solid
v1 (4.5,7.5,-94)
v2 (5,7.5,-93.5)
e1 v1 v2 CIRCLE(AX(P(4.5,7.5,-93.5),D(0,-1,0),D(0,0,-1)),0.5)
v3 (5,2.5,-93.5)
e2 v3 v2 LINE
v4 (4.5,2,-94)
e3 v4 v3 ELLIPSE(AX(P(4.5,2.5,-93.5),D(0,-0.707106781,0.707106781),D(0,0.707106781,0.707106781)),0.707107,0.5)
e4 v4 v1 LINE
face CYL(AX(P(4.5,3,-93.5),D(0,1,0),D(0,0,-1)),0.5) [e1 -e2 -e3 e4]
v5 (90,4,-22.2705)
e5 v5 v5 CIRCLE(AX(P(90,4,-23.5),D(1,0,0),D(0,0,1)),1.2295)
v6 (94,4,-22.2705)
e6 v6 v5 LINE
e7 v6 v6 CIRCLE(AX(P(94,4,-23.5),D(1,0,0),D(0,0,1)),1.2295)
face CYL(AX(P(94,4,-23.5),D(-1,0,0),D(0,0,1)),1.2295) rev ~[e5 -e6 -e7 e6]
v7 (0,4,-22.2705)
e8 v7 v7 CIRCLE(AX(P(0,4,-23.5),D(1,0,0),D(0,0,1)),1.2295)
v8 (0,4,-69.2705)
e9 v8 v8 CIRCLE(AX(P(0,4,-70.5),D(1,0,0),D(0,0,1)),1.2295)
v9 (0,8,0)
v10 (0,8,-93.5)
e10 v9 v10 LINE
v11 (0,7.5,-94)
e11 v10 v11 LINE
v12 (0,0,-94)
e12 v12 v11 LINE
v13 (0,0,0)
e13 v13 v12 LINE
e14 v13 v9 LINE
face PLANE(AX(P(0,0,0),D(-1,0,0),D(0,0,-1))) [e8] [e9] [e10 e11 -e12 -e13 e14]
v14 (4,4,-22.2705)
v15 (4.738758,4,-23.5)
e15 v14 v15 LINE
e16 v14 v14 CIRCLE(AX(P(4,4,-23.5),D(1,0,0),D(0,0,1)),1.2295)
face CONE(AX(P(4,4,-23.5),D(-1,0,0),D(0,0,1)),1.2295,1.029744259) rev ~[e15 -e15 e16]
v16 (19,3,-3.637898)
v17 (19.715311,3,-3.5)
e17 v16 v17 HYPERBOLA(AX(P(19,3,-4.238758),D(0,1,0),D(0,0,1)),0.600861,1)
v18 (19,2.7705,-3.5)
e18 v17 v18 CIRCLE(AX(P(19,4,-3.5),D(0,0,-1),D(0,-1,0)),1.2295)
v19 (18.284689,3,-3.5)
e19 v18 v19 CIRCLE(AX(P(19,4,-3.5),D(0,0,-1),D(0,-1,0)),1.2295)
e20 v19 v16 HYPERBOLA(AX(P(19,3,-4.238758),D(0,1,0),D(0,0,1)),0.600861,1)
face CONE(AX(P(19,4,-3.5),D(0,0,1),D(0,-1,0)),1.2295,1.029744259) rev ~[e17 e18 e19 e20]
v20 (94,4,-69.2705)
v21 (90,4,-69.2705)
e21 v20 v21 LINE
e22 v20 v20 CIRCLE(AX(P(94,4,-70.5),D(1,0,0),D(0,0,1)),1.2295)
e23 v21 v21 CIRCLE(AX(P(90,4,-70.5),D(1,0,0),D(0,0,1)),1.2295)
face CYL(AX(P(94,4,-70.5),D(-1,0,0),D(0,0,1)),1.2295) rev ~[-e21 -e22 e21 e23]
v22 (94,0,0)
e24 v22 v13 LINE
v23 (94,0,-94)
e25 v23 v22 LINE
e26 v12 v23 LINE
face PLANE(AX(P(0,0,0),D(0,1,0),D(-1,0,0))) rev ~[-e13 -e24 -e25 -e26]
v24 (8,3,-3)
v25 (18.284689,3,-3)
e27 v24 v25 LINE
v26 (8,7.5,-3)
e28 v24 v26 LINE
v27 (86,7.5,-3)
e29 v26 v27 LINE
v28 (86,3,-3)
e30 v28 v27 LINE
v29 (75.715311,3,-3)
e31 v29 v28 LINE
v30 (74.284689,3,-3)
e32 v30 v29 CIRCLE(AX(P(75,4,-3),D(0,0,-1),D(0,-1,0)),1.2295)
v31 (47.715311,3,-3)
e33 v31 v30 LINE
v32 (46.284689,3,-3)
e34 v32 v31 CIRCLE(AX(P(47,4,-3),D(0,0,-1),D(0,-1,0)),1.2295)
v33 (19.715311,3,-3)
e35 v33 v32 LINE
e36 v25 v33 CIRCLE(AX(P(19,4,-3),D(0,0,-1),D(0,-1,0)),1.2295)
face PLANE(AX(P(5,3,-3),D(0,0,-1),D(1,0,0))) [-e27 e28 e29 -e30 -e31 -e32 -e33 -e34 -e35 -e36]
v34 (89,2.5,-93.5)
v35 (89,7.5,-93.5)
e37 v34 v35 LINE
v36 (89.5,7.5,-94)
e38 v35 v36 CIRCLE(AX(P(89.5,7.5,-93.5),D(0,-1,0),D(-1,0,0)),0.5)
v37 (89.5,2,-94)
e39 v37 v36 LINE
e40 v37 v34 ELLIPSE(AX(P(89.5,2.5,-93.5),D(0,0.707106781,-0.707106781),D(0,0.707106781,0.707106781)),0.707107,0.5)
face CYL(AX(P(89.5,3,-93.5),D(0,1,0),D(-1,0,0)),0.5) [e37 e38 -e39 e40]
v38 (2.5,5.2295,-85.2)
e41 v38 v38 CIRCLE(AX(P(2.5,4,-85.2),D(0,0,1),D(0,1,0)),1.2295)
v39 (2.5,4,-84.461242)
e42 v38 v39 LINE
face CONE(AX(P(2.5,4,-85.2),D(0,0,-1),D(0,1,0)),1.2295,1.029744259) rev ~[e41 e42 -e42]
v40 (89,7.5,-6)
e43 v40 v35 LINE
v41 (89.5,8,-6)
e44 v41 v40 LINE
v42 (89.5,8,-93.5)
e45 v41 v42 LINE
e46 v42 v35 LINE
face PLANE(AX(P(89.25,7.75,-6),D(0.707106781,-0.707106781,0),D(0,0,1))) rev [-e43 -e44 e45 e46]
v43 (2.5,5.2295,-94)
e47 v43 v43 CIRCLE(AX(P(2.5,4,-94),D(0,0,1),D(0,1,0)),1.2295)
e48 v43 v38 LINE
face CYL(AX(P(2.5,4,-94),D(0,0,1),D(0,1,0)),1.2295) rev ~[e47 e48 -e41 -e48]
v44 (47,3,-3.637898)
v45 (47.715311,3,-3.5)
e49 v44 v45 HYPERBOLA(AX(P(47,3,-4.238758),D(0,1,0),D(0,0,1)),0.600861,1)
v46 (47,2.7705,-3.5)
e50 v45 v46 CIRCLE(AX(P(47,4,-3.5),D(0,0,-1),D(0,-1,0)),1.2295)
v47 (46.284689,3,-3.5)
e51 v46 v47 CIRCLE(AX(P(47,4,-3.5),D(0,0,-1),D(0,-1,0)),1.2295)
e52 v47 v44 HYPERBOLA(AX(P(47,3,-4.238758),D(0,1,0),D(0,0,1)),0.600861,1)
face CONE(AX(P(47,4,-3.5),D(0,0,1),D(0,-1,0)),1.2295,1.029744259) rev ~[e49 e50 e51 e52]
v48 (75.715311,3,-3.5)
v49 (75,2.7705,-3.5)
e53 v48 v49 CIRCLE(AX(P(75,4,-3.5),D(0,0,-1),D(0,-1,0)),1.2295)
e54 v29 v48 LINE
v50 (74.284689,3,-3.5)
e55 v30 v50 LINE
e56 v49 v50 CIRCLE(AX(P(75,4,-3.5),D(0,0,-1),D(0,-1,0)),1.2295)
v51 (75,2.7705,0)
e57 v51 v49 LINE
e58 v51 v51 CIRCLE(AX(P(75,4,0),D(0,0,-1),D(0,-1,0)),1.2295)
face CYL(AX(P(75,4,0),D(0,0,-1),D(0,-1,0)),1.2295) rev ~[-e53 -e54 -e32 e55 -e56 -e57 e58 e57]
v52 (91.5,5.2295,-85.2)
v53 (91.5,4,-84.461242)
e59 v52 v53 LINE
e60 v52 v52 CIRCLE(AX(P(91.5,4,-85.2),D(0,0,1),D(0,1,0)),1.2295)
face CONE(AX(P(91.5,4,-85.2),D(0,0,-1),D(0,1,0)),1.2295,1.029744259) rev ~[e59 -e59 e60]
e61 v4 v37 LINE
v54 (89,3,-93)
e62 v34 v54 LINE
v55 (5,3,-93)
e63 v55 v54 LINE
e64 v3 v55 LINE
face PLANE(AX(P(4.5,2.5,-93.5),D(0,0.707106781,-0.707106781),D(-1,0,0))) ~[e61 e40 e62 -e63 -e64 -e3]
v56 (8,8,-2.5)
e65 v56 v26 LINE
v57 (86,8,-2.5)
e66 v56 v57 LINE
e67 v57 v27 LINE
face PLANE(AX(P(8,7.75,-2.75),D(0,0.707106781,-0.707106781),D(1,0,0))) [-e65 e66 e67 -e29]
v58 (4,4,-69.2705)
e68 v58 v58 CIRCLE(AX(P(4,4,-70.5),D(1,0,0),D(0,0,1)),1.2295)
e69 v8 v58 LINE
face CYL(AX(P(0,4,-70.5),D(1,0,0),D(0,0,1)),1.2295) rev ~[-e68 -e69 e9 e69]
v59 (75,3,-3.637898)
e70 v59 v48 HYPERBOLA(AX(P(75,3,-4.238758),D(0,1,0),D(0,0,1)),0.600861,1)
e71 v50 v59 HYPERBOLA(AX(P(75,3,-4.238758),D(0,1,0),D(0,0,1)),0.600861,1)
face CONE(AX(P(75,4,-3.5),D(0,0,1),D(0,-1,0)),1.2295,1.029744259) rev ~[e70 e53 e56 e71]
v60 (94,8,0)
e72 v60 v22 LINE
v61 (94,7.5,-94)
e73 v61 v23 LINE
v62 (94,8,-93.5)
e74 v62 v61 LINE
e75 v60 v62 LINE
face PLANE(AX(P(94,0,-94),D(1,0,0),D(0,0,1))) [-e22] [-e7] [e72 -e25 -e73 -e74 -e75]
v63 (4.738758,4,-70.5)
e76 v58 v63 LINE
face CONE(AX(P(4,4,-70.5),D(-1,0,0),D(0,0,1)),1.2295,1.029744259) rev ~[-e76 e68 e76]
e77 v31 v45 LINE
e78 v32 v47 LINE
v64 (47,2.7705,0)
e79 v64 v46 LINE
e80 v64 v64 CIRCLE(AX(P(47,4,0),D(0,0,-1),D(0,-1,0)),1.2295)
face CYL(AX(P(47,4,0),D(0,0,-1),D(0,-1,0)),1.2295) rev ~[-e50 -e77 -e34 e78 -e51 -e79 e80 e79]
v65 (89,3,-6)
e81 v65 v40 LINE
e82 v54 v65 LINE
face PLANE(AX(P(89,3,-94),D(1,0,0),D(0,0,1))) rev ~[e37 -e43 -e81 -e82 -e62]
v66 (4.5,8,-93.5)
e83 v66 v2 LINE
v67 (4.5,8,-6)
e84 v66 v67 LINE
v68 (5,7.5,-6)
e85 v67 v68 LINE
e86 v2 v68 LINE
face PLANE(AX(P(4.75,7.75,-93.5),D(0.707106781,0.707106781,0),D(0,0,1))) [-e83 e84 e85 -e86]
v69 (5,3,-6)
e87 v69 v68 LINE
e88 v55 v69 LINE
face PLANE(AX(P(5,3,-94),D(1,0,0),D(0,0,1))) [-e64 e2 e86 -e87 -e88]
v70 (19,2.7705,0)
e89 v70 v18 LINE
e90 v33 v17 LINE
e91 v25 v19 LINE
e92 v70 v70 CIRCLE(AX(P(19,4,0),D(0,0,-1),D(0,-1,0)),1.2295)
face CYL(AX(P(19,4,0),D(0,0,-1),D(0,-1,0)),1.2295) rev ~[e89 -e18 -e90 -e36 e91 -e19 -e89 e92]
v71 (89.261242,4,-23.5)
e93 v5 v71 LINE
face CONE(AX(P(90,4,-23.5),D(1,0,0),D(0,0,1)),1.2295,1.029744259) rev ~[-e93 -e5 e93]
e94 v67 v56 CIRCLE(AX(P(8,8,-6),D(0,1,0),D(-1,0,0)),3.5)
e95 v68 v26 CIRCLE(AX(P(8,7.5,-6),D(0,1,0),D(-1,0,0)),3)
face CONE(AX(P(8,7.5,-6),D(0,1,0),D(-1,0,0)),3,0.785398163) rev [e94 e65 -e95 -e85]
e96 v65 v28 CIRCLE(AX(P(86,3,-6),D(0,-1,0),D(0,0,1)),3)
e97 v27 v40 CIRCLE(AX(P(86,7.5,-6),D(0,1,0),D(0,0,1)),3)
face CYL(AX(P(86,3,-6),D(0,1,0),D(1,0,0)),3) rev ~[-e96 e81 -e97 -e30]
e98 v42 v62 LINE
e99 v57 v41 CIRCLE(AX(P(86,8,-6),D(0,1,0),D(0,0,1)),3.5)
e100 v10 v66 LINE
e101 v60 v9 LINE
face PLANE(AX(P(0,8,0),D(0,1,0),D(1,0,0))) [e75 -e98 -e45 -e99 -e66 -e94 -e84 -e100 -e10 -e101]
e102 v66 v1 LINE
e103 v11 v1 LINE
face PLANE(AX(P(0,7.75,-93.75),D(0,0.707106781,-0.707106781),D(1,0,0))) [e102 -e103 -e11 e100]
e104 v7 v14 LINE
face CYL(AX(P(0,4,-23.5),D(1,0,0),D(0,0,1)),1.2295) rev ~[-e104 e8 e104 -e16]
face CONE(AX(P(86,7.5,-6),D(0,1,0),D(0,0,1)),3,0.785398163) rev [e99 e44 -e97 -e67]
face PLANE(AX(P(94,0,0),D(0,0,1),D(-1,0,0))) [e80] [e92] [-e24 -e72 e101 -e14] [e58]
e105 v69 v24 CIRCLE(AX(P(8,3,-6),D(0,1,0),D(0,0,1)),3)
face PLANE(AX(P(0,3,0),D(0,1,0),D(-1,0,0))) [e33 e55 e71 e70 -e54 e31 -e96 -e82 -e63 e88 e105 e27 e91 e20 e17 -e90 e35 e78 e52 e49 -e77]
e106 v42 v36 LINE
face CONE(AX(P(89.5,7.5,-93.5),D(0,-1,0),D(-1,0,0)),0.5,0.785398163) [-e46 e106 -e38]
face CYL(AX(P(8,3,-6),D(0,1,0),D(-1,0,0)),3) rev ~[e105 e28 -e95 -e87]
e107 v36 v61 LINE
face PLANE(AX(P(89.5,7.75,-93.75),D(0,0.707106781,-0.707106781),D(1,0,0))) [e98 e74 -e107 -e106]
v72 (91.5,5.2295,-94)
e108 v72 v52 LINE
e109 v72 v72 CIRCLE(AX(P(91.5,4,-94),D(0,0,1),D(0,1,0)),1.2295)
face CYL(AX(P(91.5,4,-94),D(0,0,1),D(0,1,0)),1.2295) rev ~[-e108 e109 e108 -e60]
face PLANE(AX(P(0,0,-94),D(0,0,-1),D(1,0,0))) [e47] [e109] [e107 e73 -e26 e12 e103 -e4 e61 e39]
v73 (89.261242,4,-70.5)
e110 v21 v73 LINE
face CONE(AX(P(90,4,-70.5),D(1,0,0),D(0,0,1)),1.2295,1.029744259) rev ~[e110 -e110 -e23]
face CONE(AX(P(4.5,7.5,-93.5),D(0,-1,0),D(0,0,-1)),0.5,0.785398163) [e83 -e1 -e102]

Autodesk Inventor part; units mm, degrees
ref_plane "YZ Plane" through (0, 0, 0) normal (1, 0, 0) x (0, 1, 0)
ref_plane "XZ Plane" through (0, 0, 0) normal (0, 1, 0) x (-1, 0, 0)
sketch "Sketch3" plane through (0, 0, 0) normal (0, 1, 0) x (-1, 0, 0)
  line L0 (3, 3) -> (-97, 3) construction
  line L1 (-97, 3) -> (-97, 0) construction
  line L2 (-97, 0) -> (3, 0) construction
  line L3 (3, 0) -> (3, 3) construction
  line L4 (-97, 0) -> (-94, 0) construction
  line L5 (-94, 0) -> (-94, -94) construction
  line L6 (-94, -94) -> (-97, -94) construction
  line L7 (-97, -94) -> (-97, 0) construction
  line L8 (-97, -94) -> (3, -94) construction
  line L9 (3, -94) -> (3, -97) construction
  line L10 (3, -97) -> (-97, -97) construction
  line L11 (-97, -97) -> (-97, -94) construction
  line L12 (3, -94) -> (0, -94) construction
  line L13 (0, -94) -> (0, 0) construction
  line L14 (0, 0) -> (3, 0) construction
  line L15 (3, 0) -> (3, -94) construction
  line L16 (0, -94) -> (-94, -94)
  line L17 (-94, -94) -> (-94, 0)
  line L18 (-94, 0) -> (0, 0)
  line L19 (0, 0) -> (0, -94)
  line L20 (3, 3) -> (3, 0) construction
  dimension "d6" = 3
  dimension "d7" = 100
  dimension "d8" = 100
  dimension "d9" = 3
extrude "Extrusion2" add sketch "Sketch3" along normal blind 3
sketch "Sketch4" plane through (0, 3, 0) normal (0, 1, 0) x (1, 0, 0)
  line L0 (94, 94) -> (0, 94) projected
  line L1 (0, 0) -> (94, 0) projected
  line L2 (0, 94) -> (5, 94)
  line L3 (5, 94) -> (5, 0)
  line L4 (5, 0) -> (0, 0)
  line L5 (0, 0) -> (0, 94)
  line L6 (94, 0) -> (94, 94) projected
  line L7 (94, 94) -> (89, 94)
  line L8 (89, 94) -> (89, 0)
  line L9 (89, 0) -> (94, 0)
  line L10 (94, 0) -> (94, 94)
  line L11 (5, 3) -> (89, 3)
  line L12 (89, 3) -> (89, 0)
  line L13 (89, 0) -> (5, 0)
  line L14 (5, 0) -> (5, 3)
  dimension "d12" = 5
  dimension "d13" = 3
extrude "Extrusion3" add sketch "Sketch4" along normal blind 5 contours L6 L1 L8 L0 | L3 L1 L5 L0 | L8 L1 L3 L11
sketch "Sketch6" plane through (94, 0, -94) normal (0, 0, -1) x (-1, 0, 0)
  line L0 (0, 0) -> (94, 0) projected
  line L1 (89, 8) -> (94, 8) projected
  line L2 (89, 3) -> (89, 8) projected
  line L3 (94, 0) -> (94, 8) projected
  line L4 (0, 0) -> (0, 8) projected
  point P0 (91.5, 4)
  point P1 (2.5, 4)
  dimension "d28" = 8
  dimension "d29" = 5
  dimension "d30" = 2.5
  dimension "d31" = 4
  dimension "d32" = 2.5
hole "Hole1" at (2.5, 4, -94) at (91.5, 4, -94) direction (0, 0, 1) diameter 2.459 depth 8.8 tip angle 118 thread size "M3x0.5" class "6H" standard "ANSI Metric M Profile"
fillet "Fillet1" radius 3 2 edges at (89, 5.5, -3) (5, 5.5, -3)
fillet "Fillet2" radius 0.5 2 edges at (5, 5.5, -94) (89, 5.5, -94)
sketch "Sketch7" plane through (0, 0, 0) normal (0, 0, 1) x (1, 0, 0)
  line L0 (0, 0) -> (94, 0) projected
  line L1 (0, 0) -> (0, 8) projected
  line L2 (89, 8) -> (5, 8) projected
  point P0 (19, 4)
  point P1 (47, 4)
  point P2 (75, 4)
  dimension "d40" = 4
  dimension "d57" = 84
  dimension "d58" = 14
  dimension "d59" = 28
  dimension "d60" = 28
hole "Hole2" at (19, 4, 0) at (47, 4, 0) at (75, 4, 0) direction (0, 0, -1) diameter 2.459 depth 3.5 tip angle 118 thread size "M3x0.5" class "6H" standard "ANSI Metric M Profile"
sketch "Sketch9" plane through (0, 0, -94) normal (-1, 0, 0) x (0, 0, 1)
  line L0 (0, 8) -> (94, 8) projected
  line L1 (0, 0) -> (94, 0) projected
  line L2 (0, 0) -> (0, 8) projected
  point P0 (23.5, 4)
  point P1 (70.5, 4)
  dimension "d51" = 4
  dimension "d52" = 8
  dimension "d53" = 94
  dimension "d54" = 23.5
  dimension "d55" = 47
hole "Hole3" at (0, 4, -70.5) at (0, 4, -23.5) direction (1, 0, 0) diameter 2.459 depth 4 tip angle 118 thread size "M3x0.5" class "6H" standard "ANSI Metric M Profile"
ref_plane "Work Plane1" through (47, 0, -94) normal (-1, 0, 0) x (0, 0, 1)
mirror "Mirror1" about plane through (47, 0, -94) normal (-1, 0, 0) of "Hole3"
chamfer "Chamfer2" distance 1 angle 45 1 edges at (47, 3, -94)
chamfer "Chamfer3" distance 0.5 angle 45 3 edges at (5, 8, -49.75) (47, 8, -3) (89, 8, -49.75)
ref_plane "Work Plane2" through (47, 0, -94) normal (-1, 0, 0) x (0, 0, 1)
equation "\"d30\" = 0.5 * d29"
equation "\"d31\" = 0.5 * d28"
equation "\"d32\" = d30"
equation "\"d58\" = 0.166667 * d57"
equation "\"d59\" = 2 * d58"
equation "\"d60\" = d59"
equation "\"d51\" = 0.5 * d52"
equation "\"d54\" = 0.25 * d53"
equation "\"d55\" = 2 * d54"
properties part number "LeftPanel" material "Aluminum 6061"
